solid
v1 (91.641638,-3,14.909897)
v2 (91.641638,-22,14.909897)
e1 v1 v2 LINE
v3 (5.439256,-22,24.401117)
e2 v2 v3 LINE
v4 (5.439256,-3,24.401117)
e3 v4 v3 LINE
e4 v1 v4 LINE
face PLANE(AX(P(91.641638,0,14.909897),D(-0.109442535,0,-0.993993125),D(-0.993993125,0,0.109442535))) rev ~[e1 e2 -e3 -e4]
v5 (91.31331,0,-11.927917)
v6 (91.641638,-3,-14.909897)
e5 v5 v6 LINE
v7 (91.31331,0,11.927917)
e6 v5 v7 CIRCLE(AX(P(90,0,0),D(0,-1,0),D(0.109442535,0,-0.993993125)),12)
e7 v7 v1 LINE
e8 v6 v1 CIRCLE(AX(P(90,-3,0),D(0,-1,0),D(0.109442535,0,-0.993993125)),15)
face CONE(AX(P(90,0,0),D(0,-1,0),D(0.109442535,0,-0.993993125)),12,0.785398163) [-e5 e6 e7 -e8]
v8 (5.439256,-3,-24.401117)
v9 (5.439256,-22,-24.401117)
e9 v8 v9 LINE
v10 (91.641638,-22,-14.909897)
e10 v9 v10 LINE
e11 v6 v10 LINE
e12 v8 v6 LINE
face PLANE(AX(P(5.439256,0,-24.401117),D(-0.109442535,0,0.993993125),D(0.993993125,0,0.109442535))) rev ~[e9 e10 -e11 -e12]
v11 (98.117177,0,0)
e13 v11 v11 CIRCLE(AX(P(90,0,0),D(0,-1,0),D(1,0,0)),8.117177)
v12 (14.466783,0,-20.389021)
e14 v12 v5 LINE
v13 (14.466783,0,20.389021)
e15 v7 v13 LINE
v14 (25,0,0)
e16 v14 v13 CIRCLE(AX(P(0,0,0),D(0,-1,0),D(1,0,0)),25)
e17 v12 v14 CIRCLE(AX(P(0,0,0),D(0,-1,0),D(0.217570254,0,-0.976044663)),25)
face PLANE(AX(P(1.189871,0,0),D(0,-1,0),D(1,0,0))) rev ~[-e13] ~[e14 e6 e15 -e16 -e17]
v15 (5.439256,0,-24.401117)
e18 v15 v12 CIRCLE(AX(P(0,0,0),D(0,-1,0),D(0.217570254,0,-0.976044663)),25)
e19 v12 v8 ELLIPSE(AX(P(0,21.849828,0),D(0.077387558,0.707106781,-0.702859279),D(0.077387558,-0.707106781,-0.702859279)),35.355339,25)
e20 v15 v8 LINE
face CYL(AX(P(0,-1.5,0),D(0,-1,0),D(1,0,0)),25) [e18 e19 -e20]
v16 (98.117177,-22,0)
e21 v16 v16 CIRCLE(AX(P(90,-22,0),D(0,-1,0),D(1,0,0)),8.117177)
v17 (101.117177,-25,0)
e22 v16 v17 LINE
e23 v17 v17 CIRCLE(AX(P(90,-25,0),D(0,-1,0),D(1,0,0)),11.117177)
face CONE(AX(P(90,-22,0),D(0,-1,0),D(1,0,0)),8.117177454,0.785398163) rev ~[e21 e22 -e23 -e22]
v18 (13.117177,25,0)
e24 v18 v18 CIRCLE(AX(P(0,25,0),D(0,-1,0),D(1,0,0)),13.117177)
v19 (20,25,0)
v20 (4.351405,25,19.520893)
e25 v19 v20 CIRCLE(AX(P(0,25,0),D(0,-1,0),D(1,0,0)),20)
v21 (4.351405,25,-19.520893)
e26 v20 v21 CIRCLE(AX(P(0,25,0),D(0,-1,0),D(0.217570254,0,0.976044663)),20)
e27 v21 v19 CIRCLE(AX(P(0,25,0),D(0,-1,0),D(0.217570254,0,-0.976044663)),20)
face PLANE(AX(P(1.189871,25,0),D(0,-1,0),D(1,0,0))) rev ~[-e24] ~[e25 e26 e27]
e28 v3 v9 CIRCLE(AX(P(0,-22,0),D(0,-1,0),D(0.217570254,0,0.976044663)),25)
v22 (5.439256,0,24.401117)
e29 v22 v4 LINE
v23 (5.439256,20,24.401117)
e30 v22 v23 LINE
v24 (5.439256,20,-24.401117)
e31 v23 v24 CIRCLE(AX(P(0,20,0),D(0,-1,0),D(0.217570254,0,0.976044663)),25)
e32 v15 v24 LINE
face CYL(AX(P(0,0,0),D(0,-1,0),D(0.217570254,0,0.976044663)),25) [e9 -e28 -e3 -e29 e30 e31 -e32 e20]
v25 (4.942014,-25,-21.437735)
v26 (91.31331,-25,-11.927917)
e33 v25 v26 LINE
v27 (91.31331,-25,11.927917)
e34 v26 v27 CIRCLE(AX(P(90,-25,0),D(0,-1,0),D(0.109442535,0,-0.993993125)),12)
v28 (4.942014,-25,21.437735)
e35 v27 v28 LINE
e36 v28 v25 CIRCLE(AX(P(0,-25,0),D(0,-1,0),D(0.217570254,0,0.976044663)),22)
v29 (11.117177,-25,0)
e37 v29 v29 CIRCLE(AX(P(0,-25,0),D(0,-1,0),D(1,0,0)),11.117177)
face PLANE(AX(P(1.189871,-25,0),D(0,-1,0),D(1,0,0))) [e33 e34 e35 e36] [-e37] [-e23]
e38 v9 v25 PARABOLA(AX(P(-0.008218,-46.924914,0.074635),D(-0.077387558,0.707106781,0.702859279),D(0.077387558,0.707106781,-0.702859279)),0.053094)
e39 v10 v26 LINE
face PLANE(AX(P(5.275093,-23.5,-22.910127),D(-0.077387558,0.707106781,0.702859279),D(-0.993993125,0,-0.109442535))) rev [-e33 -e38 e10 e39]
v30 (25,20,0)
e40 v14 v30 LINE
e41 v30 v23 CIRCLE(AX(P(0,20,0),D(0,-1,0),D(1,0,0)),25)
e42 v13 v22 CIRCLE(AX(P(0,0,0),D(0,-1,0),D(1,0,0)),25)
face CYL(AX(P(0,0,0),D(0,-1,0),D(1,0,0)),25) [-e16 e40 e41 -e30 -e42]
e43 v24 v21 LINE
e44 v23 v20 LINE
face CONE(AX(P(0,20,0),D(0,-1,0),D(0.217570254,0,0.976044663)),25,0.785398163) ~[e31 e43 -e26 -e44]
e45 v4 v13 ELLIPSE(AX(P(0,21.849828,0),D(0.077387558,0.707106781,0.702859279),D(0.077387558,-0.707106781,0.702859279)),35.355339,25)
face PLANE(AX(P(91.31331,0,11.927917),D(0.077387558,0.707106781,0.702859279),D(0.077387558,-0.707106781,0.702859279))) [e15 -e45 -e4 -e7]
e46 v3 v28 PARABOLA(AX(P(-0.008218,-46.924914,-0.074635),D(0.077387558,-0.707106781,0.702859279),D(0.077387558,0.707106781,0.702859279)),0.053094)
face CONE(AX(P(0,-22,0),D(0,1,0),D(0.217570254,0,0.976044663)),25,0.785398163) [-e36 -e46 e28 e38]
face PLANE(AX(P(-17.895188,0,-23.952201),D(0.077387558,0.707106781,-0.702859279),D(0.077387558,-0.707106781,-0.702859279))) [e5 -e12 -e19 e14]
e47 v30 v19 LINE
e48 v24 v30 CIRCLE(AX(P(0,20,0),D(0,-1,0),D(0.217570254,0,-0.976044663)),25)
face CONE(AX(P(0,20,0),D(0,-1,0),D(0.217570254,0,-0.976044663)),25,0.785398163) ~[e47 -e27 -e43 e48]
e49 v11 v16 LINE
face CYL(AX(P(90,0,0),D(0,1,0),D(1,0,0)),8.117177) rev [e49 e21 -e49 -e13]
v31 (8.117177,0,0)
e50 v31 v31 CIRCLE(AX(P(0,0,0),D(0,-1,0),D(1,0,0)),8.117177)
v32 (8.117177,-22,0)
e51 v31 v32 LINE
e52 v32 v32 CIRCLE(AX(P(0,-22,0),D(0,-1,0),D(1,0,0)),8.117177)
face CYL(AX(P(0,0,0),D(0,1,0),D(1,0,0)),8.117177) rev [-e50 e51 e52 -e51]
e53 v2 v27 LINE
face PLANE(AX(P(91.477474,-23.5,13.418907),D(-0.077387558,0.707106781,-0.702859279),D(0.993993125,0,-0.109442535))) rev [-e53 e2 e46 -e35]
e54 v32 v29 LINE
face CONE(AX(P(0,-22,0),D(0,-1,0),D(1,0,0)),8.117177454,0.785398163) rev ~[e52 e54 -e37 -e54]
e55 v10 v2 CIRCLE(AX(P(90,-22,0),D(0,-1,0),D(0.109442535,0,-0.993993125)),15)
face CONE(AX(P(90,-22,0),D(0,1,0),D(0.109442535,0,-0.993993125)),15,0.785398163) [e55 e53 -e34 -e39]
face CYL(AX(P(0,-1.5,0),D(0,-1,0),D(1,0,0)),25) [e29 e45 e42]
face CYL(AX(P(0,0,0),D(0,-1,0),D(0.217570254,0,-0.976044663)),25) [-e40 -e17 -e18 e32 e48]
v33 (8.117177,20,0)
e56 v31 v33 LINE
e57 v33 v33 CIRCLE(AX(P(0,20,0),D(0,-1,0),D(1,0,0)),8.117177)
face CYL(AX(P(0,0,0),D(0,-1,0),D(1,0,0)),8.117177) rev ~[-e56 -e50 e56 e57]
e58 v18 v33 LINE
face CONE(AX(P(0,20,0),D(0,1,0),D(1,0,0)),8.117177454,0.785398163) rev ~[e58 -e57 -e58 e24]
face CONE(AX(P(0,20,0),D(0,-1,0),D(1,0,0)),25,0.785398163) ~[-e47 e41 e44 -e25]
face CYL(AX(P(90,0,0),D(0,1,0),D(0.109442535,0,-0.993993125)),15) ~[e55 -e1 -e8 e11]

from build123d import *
from build123d import SkipClean  # not in build123d's __all__

# Parameters (mm, degrees)
F0_R         = 8.117177454
F1_DEPTH     = 25
F2_SIZE      = 3
F3_DEPTH     = 25
F4_SIZE      = 5
F5_T4_DEPTH  = 109.868464735
F5_S5_R      = 25
F5_T6_DEPTH  = 57
F5_T8_ANGLE  = 167.4336377222
F5_T12_DEPTH = 109.868464735
F5_S13_R     = 25
F5_T14_DEPTH = 57


# Not quite as in the source:
# - a fillet or chamfer that OpenCascade refuses, or shapes differently, is made with other operations: its cross-section is extruded or revolved along the edge and cut away or added


with BuildPart() as f1:
    # F0 (on Front) → F1 (new body)
    with BuildSketch(Plane.XZ):
        with BuildLine():
            ThreePointArc((5.4392563458, -24.4011165811), (19.5061709293, -15.6367930113), (25, 0))
            ThreePointArc((25, 0), (19.5061709293, 15.6367930113), (5.4392563458, 24.4011165811))
            ThreePointArc((5.4392563458, 24.4011165811), (-25, 0), (5.4392563458, -24.4011165811))
        make_face()
        Circle(F0_R, mode=Mode.SUBTRACT)
        with BuildLine():
            ThreePointArc((5.4392563458, 24.4011165811), (19.5061709293, 15.6367930113), (25, 0))
            ThreePointArc((25, 0), (19.5061709293, -15.6367930113), (5.4392563458, -24.4011165811))
            Line((5.4392563458, -24.4011165811), (91.6416380189, -14.909896868))
            ThreePointArc((91.6416380189, -14.909896868), (75, 0), (91.6416380189, 14.909896868))
            Line((91.6416380189, 14.909896868), (5.4392563458, 24.4011165811))
        make_face()
        with BuildLine():
            ThreePointArc((105, 0), (101.1719418698, 10.0093813424), (91.6416380189, 14.909896868))
            ThreePointArc((91.6416380189, 14.909896868), (75, 0), (91.6416380189, -14.909896868))
            ThreePointArc((91.6416380189, -14.909896868), (101.1719418698, -10.0093813424), (105, 0))
        make_face()
        with Locations((90, 0)):
            Circle(F0_R, mode=Mode.SUBTRACT)
    extrude(amount=F1_DEPTH)

    # F2
    f2_edges = [f1.edges().sort_by_distance(p)[0] for p in [
        (-25, -25, 0),
        (48.540447, -25, -19.655507),
        (105, -25, 0),
        (48.540447, -25, 19.655507),
        (-8.117177, -25, 0),
        (81.882823, -25, 0),
    ]]
    chamfer(f2_edges, length=F2_SIZE)

    # F0 (on Front) → F3 (join)
    with BuildSketch(Plane.XZ):
        with BuildLine():
            ThreePointArc((5.4392563458, -24.4011165811), (19.5061709293, -15.6367930113), (25, 0))
            ThreePointArc((25, 0), (19.5061709293, 15.6367930113), (5.4392563458, 24.4011165811))
            ThreePointArc((5.4392563458, 24.4011165811), (-25, 0), (5.4392563458, -24.4011165811))
        make_face()
        Circle(F0_R, mode=Mode.SUBTRACT)
    with SkipClean():  # cleaning this boolean's faces spoils the solid; the shape is the same uncleaned
        extrude(amount=-F3_DEPTH)

    # F4
    f4_edges = [f1.edges().sort_by_distance(p)[0] for p in [
        (-5.439256, 25, 24.401117),
        (-8.117177, 25, 0),
    ]]
    chamfer(f4_edges, length=F4_SIZE)

    # F5: chamfer of 3 on 1 edges, made by hand


with BuildPart() as f5_tool2:
    # F5_s3 → F5_t4 (new body)
    with BuildSketch(Plane(origin=(88.922009846, 0, -9.7906614225), x_dir=(0, 1, 0), z_dir=(-0.9939931245, 0, 0.1094425346))):
        Polygon((0, -21.8498281134), (-3, -24.8498281134), (0, -24.8498281134), align=None)
    extrude(amount=F5_T4_DEPTH)

    # F5_s5 → F5_t6 (cut, symmetric)
    with BuildSketch(Plane.XZ.offset(1.5)):
        Circle(F5_S5_R)
    extrude(amount=F5_T6_DEPTH, both=True, mode=Mode.SUBTRACT)


with BuildPart() as f1_1:
    add(f1.part, clean=False)

    # F5_t1: cut F5_tool2
    add(f5_tool2.part, mode=Mode.SUBTRACT)

    # F5_s7 → F5_t8 (revolve, cut)
    with BuildSketch(Plane(origin=(88.922009846, 0, 9.7906614225), x_dir=(0, 1, 0), z_dir=(-0.9939931245, 0, -0.1094425346))):
        Polygon((0, 21.8498281134), (-3, 24.8498281134), (0, 24.8498281134), align=None)
    revolve(axis=Axis((90, 0, 0), (0, -1, 0)), revolution_arc=F5_T8_ANGLE, mode=Mode.SUBTRACT)


with BuildPart() as f5_tool10:
    # F5_s11 → F5_t12 (new body)
    with BuildSketch(Plane(origin=(-20.2864887038, 0, -2.2336218299), x_dir=(0, 1, 0), z_dir=(0.9939931245, 0, 0.1094425346))):
        Polygon((0, -21.8498281134), (-3, -24.8498281134), (0, -24.8498281134), align=None)
    extrude(amount=F5_T12_DEPTH)

    # F5_s13 → F5_t14 (cut, symmetric)
    with BuildSketch(Plane.XZ.offset(1.5)):
        Circle(F5_S13_R)
    extrude(amount=F5_T14_DEPTH, both=True, mode=Mode.SUBTRACT)


with BuildPart() as f1_2:
    add(f1_1.part, clean=False)

    # F5_t9: cut F5_tool10
    add(f5_tool10.part, mode=Mode.SUBTRACT)


solid = f1_2.part
